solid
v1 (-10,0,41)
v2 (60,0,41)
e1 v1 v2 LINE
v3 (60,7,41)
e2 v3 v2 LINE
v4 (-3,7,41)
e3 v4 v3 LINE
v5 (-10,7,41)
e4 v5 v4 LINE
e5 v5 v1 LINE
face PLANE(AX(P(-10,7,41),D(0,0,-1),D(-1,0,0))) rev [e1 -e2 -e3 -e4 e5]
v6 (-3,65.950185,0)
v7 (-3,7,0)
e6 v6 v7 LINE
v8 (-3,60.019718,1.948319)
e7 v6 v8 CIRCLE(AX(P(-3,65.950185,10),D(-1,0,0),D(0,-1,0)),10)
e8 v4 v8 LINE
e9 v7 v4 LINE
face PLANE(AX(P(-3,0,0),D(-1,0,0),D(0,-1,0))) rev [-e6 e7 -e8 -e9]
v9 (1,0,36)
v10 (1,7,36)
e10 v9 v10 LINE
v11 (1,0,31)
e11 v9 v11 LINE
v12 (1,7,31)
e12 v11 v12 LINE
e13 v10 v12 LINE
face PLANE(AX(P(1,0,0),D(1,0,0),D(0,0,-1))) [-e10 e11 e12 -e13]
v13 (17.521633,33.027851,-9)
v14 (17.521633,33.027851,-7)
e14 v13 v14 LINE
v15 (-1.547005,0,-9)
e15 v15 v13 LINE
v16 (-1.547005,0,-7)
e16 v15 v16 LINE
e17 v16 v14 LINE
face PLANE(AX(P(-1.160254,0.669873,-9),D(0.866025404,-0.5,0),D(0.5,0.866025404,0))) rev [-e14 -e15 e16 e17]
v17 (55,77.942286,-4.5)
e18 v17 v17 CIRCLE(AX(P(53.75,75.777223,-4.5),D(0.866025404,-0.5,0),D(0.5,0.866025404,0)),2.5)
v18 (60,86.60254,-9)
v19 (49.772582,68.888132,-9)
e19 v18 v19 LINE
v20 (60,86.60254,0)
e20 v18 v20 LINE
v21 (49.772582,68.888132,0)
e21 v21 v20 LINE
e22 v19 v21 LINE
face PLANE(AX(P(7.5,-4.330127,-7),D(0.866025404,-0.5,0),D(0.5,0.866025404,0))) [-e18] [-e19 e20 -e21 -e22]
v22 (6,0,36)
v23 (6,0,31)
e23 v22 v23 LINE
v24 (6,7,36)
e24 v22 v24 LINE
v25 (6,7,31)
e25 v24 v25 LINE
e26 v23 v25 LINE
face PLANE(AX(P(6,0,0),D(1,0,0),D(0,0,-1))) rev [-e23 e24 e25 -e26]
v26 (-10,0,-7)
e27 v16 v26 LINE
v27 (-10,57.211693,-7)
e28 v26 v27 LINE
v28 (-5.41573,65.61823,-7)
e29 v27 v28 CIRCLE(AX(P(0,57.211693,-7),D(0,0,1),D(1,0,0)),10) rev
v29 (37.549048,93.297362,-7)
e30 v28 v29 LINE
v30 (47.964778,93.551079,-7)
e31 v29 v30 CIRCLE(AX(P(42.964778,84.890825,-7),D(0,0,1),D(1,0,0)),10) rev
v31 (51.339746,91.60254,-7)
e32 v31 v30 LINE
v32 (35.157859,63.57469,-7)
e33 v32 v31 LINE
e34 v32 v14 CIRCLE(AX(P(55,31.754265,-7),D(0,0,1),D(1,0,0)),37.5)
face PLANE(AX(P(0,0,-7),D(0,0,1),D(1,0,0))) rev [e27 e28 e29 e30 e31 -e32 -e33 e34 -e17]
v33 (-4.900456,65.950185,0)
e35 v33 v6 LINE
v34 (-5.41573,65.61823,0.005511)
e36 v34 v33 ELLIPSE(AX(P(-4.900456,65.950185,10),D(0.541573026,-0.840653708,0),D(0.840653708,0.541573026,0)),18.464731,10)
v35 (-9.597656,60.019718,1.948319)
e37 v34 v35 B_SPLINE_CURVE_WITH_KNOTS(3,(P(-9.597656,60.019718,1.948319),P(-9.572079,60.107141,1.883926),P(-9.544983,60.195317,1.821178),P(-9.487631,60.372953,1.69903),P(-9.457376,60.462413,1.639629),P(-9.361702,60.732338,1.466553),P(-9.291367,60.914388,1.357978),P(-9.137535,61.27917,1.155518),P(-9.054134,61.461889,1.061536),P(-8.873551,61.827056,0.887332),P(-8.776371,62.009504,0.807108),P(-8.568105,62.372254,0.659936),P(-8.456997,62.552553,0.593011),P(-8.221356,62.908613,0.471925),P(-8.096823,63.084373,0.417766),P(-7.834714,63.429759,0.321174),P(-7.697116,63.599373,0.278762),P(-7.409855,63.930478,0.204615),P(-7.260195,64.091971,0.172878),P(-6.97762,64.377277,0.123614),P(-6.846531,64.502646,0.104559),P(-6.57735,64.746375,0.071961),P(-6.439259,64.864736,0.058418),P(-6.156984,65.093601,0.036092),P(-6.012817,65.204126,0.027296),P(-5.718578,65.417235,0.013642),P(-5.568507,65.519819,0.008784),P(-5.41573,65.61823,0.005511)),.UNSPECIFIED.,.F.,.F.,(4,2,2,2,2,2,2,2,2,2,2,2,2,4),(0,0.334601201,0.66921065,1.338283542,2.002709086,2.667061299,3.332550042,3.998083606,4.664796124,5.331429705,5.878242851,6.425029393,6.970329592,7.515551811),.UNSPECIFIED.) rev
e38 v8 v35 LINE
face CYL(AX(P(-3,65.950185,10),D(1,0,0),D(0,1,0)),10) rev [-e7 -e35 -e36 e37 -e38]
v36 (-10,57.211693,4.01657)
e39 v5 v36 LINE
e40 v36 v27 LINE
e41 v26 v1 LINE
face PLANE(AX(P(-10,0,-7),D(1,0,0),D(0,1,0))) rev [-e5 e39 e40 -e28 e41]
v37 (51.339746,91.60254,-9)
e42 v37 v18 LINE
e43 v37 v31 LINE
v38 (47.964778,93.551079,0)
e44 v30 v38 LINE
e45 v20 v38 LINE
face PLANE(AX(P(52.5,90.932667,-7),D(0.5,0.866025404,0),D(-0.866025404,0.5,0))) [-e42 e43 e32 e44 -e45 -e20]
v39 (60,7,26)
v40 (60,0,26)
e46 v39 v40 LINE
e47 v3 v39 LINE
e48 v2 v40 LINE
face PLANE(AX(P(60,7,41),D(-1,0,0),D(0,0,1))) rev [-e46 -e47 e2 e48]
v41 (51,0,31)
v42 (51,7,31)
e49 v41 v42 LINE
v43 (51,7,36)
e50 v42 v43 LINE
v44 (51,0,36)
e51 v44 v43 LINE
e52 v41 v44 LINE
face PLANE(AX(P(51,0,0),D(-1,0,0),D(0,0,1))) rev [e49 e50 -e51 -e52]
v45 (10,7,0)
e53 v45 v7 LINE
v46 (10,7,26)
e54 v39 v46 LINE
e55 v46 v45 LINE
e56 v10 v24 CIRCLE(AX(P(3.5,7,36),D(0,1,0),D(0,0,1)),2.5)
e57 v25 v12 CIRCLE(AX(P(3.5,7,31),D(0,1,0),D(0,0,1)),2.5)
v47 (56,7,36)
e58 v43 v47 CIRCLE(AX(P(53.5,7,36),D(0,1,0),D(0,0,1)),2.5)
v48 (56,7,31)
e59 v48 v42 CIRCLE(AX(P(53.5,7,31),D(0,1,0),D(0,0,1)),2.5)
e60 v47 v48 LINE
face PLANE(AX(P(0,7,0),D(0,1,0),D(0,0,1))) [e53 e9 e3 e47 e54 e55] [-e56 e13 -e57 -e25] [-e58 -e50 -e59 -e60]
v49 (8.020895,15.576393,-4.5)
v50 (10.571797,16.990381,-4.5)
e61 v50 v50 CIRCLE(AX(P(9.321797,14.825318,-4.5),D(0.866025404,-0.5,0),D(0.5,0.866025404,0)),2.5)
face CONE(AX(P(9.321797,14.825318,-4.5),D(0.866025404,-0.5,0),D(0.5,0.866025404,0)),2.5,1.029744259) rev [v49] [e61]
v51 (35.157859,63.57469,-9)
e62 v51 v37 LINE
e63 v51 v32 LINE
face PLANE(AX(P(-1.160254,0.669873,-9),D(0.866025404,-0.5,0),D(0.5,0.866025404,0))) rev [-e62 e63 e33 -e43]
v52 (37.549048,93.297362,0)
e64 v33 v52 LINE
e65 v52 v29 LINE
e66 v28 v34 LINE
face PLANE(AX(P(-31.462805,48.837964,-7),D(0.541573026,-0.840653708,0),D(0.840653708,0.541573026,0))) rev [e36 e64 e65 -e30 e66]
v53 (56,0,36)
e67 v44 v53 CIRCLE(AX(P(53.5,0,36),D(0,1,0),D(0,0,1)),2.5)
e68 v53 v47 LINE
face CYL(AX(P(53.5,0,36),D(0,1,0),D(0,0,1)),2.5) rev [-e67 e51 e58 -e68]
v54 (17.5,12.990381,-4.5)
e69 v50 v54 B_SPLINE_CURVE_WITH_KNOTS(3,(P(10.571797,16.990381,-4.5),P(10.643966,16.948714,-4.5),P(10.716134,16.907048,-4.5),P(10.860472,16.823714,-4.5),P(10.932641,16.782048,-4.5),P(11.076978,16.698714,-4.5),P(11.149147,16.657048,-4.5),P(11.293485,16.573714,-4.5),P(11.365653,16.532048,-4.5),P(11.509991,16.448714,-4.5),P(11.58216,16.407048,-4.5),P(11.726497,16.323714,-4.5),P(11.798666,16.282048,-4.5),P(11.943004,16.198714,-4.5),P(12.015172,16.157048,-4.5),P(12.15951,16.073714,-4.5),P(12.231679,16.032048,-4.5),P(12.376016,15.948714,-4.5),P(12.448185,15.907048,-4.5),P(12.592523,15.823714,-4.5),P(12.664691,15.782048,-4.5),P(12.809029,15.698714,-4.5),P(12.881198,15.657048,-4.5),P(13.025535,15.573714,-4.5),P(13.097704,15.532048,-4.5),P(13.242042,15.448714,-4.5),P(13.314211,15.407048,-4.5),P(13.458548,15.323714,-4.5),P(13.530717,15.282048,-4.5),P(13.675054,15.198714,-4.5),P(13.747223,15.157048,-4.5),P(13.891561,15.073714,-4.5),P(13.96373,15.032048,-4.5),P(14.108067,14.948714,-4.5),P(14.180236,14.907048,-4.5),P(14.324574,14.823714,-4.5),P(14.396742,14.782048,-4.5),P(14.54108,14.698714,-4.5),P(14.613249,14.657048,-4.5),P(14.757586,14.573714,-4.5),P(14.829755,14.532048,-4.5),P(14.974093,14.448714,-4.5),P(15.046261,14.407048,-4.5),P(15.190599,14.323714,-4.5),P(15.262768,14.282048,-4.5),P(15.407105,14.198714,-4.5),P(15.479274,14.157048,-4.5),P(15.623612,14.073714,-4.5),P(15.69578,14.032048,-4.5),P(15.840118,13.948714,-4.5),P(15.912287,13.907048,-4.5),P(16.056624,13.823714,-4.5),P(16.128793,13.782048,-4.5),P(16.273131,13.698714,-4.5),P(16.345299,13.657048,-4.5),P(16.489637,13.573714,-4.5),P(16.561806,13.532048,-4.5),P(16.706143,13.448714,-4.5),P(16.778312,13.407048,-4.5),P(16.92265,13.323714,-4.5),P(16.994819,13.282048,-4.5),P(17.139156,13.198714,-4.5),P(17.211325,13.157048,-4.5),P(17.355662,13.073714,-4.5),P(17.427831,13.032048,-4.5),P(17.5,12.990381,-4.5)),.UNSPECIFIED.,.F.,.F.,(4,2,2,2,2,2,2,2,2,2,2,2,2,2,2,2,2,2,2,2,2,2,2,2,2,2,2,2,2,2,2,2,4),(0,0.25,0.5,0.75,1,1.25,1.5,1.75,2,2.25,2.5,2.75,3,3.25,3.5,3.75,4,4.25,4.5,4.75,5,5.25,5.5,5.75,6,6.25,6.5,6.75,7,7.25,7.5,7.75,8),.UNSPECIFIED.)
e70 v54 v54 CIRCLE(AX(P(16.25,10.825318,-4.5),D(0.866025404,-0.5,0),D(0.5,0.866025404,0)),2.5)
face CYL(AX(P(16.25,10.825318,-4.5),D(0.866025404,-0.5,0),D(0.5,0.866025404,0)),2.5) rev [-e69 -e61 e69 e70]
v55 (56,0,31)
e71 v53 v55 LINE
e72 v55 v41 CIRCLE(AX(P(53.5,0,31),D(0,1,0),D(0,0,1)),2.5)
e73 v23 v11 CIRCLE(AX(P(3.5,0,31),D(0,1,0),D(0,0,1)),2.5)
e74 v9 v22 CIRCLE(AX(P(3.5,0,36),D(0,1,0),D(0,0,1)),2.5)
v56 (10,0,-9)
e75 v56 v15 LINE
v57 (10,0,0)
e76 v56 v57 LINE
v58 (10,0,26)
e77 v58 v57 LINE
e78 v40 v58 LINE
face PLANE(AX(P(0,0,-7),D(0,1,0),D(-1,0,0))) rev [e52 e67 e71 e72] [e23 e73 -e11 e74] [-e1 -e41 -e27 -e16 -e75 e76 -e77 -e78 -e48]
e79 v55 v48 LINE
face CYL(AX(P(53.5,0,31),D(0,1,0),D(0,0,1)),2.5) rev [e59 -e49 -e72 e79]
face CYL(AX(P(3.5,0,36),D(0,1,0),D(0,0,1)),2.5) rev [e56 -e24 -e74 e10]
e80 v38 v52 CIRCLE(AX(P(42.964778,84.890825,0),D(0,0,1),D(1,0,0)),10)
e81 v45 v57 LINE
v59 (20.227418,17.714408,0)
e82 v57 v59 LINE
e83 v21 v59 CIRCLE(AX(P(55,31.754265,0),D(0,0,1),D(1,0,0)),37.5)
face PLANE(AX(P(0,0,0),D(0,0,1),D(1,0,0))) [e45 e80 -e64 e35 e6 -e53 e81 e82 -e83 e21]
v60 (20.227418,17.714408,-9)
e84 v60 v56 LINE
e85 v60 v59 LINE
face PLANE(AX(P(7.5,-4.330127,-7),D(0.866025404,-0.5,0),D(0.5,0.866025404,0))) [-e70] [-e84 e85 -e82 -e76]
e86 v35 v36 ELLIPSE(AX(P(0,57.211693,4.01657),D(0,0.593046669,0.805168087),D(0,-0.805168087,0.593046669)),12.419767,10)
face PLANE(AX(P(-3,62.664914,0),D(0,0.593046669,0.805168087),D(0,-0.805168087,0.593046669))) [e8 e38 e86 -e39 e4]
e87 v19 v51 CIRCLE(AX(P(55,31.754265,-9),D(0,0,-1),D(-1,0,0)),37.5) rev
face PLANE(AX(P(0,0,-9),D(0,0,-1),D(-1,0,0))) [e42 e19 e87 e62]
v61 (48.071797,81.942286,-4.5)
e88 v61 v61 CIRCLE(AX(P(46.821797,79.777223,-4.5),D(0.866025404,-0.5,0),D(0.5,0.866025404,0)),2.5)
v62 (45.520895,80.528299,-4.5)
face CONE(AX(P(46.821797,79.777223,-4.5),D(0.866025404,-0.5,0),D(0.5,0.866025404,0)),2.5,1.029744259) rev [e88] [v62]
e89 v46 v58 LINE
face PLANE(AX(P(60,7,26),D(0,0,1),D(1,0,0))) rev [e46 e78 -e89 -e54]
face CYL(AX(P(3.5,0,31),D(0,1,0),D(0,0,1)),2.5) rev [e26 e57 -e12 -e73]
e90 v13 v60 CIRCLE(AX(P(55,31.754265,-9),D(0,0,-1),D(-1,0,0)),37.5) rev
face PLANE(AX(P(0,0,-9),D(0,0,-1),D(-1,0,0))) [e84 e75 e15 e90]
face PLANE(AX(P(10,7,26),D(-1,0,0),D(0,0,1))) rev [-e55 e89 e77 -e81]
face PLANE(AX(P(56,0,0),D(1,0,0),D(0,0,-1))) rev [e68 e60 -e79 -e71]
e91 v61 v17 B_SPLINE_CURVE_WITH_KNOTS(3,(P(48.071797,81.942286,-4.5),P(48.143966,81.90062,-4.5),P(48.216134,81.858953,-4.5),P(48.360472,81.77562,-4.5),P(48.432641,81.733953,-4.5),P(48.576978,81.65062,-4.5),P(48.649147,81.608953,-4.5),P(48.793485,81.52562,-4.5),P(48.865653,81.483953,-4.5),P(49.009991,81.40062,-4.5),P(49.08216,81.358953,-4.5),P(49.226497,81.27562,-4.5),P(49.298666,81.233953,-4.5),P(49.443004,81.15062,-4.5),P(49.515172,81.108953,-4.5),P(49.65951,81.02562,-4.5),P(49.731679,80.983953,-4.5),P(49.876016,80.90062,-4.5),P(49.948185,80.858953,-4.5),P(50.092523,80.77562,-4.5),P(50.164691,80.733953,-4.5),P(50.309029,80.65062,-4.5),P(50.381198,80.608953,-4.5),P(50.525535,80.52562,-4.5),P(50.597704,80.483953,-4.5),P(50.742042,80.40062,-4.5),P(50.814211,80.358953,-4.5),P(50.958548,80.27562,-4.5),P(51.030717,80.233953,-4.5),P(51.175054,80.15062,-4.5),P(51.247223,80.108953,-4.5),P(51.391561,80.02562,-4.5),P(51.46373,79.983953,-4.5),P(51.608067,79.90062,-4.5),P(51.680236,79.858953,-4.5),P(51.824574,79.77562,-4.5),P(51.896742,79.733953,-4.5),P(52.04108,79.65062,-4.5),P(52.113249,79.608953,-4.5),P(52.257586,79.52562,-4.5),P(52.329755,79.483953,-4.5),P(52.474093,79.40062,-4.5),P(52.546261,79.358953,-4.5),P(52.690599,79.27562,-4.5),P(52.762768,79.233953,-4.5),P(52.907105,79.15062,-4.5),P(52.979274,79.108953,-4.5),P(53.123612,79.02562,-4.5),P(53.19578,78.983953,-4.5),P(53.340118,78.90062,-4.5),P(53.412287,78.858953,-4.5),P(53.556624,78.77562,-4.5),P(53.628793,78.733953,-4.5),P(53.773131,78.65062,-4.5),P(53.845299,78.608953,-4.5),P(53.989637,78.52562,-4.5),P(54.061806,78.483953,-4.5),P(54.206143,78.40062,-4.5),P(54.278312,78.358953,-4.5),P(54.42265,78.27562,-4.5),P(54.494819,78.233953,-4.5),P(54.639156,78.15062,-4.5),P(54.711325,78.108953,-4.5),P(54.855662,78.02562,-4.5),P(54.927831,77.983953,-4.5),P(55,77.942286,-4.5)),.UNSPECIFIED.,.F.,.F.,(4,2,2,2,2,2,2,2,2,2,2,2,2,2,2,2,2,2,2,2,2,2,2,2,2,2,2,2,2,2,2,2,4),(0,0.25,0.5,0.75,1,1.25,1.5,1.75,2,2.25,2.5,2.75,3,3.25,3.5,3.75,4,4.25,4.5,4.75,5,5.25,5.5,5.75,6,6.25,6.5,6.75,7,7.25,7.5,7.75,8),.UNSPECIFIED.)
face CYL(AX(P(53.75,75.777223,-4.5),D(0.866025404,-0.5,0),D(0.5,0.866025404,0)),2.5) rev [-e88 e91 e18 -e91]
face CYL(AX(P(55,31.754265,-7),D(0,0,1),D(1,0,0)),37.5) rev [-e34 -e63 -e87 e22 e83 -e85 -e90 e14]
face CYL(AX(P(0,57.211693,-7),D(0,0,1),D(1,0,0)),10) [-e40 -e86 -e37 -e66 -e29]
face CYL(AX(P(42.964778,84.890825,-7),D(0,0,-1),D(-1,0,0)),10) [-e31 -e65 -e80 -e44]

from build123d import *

# Parameters (mm, degrees)
BOSS_EXTRUDE1_DEPTH             = 7
BOSS_EXTRUDE3_DEPTH             = 2
TAP_DRILL_FOR_M6X1_0_TAP1_D     = 5
TAP_DRILL_FOR_M6X1_0_TAP1_DEPTH = 8
TAP_DRILL_FOR_M6X1_0_TAP1_TIP   = 1.502151548
BOSS_EXTRUDE4_DEPTH             = 7
BOSS_EXTRUDE5_DEPTH             = 7
CUT_EXTRUDE1_DEPTH              = 116.367305777
FILLET2_R                       = 10


with BuildPart() as part:
    # Sketch1 → Boss-Extrude1 (new body)
    with BuildSketch(Plane.XY):
        with BuildLine():
            Line((49.772581584, 68.888132052), (60, 86.602540378))
            Line((60, 86.602540378), (42.679491924, 96.602540378))
            Line((42.679491924, 96.602540378), (-10, 62.664913519))
            Line((-10, 62.664913519), (-10, 0))
            Line((-10, 0), (10, 0))
            Line((10, 0), (20.227418416, 17.714408326))
            ThreePointArc((20.227418416, 17.714408326), (22.524047358, 50.504264805), (49.772581584, 68.888132052))
        make_face()
    extrude(amount=-BOSS_EXTRUDE1_DEPTH)

    # Sketch5 → Boss-Extrude3 (add)
    with BuildSketch(Plane(origin=(0, 0, -7), x_dir=(-1, 0, 0), z_dir=(0, 0, -1))):
        with BuildLine():
            Line((-51.339745962, 91.602540378), (-60, 86.602540378))
            Line((-60, 86.602540378), (-49.772581584, 68.888132052))
            ThreePointArc((-49.772581584, 68.888132052), (-42.186769591, 66.997294279), (-35.157858732, 63.574689534))
            Line((-35.157858732, 63.574689534), (-51.339745962, 91.602540378))
        make_face()
        with BuildLine():
            ThreePointArc((-17.521633192, 33.027850844), (-18.072025965, 25.229333108), (-20.227418416, 17.714408326))
            Line((-20.227418416, 17.714408326), (-10, 0))
            Line((-10, 0), (1.547005384, 0))
            Line((1.547005384, 0), (-17.521633192, 33.027850844))
        make_face()
    extrude(amount=BOSS_EXTRUDE3_DEPTH)

    # Tap Drill for M6x1.0 Tap1
    with Locations(Plane(origin=(7.5, -4.330127019, 0), x_dir=(0, 0, -1), z_dir=(0.8660254037844368, -0.5000000000000031, 0))):
        with Locations((4.5, 92.5), (4.5, 17.5)):
            Hole(TAP_DRILL_FOR_M6X1_0_TAP1_D / 2, depth=TAP_DRILL_FOR_M6X1_0_TAP1_DEPTH)
            with Locations((0, 0, -(TAP_DRILL_FOR_M6X1_0_TAP1_DEPTH + TAP_DRILL_FOR_M6X1_0_TAP1_TIP / 2))):  # 118° drill point
                Cone(0, TAP_DRILL_FOR_M6X1_0_TAP1_D / 2, TAP_DRILL_FOR_M6X1_0_TAP1_TIP, mode=Mode.SUBTRACT)

    # Sketch9 → Boss-Extrude4 (add)
    with BuildSketch(Plane(origin=(0, 0, 0), x_dir=(1, 0, 0), z_dir=(0, 1, 0))):
        Polygon((-10, 0), (-10, -41), (60, -41), (60, -26), (10, -26), (10, 0), align=None)
    extrude(amount=BOSS_EXTRUDE4_DEPTH)

    # Sketch10 → Boss-Extrude5 (add)
    with BuildSketch(Plane.ZY.offset(10)):
        Polygon((0, 62.664913519), (41, 7), (0, 7), align=None)
    extrude(amount=-BOSS_EXTRUDE5_DEPTH)

    # Sketch11 → Cut-Extrude1 (cut, through all)
    with BuildSketch(Plane(origin=(0, 7, 0), x_dir=(1, 0, 0), z_dir=(0, 1, 0))):
        with BuildLine():
            ThreePointArc((1, -36), (3.5, -38.5), (6, -36))
            Line((6, -36), (6, -31))
            ThreePointArc((6, -31), (3.5, -28.5), (1, -31))
            Line((1, -31), (1, -36))
        make_face()
        with BuildLine():
            Line((51, -31), (51, -36))
            ThreePointArc((51, -36), (53.5, -38.5), (56, -36))
            Line((56, -36), (56, -31))
            ThreePointArc((56, -31), (53.5, -28.5), (51, -31))
        make_face()
    extrude(amount=-CUT_EXTRUDE1_DEPTH, mode=Mode.SUBTRACT)

    # Fillet2
    fillet2_edges = [part.edges().sort_by_distance(p)[0] for p in [
        (-6.5, 62.664913519, 0),
    ]]
    fillet(fillet2_edges, radius=FILLET2_R)
    fillet2_2_edges = [part.edges().sort_by_distance(p)[0] for p in [
        (-10, 62.664913519, -3.222472691),
        (42.679491924, 96.602540378, -3.5),
    ]]
    fillet(fillet2_2_edges, radius=FILLET2_R)


solid = part.part
